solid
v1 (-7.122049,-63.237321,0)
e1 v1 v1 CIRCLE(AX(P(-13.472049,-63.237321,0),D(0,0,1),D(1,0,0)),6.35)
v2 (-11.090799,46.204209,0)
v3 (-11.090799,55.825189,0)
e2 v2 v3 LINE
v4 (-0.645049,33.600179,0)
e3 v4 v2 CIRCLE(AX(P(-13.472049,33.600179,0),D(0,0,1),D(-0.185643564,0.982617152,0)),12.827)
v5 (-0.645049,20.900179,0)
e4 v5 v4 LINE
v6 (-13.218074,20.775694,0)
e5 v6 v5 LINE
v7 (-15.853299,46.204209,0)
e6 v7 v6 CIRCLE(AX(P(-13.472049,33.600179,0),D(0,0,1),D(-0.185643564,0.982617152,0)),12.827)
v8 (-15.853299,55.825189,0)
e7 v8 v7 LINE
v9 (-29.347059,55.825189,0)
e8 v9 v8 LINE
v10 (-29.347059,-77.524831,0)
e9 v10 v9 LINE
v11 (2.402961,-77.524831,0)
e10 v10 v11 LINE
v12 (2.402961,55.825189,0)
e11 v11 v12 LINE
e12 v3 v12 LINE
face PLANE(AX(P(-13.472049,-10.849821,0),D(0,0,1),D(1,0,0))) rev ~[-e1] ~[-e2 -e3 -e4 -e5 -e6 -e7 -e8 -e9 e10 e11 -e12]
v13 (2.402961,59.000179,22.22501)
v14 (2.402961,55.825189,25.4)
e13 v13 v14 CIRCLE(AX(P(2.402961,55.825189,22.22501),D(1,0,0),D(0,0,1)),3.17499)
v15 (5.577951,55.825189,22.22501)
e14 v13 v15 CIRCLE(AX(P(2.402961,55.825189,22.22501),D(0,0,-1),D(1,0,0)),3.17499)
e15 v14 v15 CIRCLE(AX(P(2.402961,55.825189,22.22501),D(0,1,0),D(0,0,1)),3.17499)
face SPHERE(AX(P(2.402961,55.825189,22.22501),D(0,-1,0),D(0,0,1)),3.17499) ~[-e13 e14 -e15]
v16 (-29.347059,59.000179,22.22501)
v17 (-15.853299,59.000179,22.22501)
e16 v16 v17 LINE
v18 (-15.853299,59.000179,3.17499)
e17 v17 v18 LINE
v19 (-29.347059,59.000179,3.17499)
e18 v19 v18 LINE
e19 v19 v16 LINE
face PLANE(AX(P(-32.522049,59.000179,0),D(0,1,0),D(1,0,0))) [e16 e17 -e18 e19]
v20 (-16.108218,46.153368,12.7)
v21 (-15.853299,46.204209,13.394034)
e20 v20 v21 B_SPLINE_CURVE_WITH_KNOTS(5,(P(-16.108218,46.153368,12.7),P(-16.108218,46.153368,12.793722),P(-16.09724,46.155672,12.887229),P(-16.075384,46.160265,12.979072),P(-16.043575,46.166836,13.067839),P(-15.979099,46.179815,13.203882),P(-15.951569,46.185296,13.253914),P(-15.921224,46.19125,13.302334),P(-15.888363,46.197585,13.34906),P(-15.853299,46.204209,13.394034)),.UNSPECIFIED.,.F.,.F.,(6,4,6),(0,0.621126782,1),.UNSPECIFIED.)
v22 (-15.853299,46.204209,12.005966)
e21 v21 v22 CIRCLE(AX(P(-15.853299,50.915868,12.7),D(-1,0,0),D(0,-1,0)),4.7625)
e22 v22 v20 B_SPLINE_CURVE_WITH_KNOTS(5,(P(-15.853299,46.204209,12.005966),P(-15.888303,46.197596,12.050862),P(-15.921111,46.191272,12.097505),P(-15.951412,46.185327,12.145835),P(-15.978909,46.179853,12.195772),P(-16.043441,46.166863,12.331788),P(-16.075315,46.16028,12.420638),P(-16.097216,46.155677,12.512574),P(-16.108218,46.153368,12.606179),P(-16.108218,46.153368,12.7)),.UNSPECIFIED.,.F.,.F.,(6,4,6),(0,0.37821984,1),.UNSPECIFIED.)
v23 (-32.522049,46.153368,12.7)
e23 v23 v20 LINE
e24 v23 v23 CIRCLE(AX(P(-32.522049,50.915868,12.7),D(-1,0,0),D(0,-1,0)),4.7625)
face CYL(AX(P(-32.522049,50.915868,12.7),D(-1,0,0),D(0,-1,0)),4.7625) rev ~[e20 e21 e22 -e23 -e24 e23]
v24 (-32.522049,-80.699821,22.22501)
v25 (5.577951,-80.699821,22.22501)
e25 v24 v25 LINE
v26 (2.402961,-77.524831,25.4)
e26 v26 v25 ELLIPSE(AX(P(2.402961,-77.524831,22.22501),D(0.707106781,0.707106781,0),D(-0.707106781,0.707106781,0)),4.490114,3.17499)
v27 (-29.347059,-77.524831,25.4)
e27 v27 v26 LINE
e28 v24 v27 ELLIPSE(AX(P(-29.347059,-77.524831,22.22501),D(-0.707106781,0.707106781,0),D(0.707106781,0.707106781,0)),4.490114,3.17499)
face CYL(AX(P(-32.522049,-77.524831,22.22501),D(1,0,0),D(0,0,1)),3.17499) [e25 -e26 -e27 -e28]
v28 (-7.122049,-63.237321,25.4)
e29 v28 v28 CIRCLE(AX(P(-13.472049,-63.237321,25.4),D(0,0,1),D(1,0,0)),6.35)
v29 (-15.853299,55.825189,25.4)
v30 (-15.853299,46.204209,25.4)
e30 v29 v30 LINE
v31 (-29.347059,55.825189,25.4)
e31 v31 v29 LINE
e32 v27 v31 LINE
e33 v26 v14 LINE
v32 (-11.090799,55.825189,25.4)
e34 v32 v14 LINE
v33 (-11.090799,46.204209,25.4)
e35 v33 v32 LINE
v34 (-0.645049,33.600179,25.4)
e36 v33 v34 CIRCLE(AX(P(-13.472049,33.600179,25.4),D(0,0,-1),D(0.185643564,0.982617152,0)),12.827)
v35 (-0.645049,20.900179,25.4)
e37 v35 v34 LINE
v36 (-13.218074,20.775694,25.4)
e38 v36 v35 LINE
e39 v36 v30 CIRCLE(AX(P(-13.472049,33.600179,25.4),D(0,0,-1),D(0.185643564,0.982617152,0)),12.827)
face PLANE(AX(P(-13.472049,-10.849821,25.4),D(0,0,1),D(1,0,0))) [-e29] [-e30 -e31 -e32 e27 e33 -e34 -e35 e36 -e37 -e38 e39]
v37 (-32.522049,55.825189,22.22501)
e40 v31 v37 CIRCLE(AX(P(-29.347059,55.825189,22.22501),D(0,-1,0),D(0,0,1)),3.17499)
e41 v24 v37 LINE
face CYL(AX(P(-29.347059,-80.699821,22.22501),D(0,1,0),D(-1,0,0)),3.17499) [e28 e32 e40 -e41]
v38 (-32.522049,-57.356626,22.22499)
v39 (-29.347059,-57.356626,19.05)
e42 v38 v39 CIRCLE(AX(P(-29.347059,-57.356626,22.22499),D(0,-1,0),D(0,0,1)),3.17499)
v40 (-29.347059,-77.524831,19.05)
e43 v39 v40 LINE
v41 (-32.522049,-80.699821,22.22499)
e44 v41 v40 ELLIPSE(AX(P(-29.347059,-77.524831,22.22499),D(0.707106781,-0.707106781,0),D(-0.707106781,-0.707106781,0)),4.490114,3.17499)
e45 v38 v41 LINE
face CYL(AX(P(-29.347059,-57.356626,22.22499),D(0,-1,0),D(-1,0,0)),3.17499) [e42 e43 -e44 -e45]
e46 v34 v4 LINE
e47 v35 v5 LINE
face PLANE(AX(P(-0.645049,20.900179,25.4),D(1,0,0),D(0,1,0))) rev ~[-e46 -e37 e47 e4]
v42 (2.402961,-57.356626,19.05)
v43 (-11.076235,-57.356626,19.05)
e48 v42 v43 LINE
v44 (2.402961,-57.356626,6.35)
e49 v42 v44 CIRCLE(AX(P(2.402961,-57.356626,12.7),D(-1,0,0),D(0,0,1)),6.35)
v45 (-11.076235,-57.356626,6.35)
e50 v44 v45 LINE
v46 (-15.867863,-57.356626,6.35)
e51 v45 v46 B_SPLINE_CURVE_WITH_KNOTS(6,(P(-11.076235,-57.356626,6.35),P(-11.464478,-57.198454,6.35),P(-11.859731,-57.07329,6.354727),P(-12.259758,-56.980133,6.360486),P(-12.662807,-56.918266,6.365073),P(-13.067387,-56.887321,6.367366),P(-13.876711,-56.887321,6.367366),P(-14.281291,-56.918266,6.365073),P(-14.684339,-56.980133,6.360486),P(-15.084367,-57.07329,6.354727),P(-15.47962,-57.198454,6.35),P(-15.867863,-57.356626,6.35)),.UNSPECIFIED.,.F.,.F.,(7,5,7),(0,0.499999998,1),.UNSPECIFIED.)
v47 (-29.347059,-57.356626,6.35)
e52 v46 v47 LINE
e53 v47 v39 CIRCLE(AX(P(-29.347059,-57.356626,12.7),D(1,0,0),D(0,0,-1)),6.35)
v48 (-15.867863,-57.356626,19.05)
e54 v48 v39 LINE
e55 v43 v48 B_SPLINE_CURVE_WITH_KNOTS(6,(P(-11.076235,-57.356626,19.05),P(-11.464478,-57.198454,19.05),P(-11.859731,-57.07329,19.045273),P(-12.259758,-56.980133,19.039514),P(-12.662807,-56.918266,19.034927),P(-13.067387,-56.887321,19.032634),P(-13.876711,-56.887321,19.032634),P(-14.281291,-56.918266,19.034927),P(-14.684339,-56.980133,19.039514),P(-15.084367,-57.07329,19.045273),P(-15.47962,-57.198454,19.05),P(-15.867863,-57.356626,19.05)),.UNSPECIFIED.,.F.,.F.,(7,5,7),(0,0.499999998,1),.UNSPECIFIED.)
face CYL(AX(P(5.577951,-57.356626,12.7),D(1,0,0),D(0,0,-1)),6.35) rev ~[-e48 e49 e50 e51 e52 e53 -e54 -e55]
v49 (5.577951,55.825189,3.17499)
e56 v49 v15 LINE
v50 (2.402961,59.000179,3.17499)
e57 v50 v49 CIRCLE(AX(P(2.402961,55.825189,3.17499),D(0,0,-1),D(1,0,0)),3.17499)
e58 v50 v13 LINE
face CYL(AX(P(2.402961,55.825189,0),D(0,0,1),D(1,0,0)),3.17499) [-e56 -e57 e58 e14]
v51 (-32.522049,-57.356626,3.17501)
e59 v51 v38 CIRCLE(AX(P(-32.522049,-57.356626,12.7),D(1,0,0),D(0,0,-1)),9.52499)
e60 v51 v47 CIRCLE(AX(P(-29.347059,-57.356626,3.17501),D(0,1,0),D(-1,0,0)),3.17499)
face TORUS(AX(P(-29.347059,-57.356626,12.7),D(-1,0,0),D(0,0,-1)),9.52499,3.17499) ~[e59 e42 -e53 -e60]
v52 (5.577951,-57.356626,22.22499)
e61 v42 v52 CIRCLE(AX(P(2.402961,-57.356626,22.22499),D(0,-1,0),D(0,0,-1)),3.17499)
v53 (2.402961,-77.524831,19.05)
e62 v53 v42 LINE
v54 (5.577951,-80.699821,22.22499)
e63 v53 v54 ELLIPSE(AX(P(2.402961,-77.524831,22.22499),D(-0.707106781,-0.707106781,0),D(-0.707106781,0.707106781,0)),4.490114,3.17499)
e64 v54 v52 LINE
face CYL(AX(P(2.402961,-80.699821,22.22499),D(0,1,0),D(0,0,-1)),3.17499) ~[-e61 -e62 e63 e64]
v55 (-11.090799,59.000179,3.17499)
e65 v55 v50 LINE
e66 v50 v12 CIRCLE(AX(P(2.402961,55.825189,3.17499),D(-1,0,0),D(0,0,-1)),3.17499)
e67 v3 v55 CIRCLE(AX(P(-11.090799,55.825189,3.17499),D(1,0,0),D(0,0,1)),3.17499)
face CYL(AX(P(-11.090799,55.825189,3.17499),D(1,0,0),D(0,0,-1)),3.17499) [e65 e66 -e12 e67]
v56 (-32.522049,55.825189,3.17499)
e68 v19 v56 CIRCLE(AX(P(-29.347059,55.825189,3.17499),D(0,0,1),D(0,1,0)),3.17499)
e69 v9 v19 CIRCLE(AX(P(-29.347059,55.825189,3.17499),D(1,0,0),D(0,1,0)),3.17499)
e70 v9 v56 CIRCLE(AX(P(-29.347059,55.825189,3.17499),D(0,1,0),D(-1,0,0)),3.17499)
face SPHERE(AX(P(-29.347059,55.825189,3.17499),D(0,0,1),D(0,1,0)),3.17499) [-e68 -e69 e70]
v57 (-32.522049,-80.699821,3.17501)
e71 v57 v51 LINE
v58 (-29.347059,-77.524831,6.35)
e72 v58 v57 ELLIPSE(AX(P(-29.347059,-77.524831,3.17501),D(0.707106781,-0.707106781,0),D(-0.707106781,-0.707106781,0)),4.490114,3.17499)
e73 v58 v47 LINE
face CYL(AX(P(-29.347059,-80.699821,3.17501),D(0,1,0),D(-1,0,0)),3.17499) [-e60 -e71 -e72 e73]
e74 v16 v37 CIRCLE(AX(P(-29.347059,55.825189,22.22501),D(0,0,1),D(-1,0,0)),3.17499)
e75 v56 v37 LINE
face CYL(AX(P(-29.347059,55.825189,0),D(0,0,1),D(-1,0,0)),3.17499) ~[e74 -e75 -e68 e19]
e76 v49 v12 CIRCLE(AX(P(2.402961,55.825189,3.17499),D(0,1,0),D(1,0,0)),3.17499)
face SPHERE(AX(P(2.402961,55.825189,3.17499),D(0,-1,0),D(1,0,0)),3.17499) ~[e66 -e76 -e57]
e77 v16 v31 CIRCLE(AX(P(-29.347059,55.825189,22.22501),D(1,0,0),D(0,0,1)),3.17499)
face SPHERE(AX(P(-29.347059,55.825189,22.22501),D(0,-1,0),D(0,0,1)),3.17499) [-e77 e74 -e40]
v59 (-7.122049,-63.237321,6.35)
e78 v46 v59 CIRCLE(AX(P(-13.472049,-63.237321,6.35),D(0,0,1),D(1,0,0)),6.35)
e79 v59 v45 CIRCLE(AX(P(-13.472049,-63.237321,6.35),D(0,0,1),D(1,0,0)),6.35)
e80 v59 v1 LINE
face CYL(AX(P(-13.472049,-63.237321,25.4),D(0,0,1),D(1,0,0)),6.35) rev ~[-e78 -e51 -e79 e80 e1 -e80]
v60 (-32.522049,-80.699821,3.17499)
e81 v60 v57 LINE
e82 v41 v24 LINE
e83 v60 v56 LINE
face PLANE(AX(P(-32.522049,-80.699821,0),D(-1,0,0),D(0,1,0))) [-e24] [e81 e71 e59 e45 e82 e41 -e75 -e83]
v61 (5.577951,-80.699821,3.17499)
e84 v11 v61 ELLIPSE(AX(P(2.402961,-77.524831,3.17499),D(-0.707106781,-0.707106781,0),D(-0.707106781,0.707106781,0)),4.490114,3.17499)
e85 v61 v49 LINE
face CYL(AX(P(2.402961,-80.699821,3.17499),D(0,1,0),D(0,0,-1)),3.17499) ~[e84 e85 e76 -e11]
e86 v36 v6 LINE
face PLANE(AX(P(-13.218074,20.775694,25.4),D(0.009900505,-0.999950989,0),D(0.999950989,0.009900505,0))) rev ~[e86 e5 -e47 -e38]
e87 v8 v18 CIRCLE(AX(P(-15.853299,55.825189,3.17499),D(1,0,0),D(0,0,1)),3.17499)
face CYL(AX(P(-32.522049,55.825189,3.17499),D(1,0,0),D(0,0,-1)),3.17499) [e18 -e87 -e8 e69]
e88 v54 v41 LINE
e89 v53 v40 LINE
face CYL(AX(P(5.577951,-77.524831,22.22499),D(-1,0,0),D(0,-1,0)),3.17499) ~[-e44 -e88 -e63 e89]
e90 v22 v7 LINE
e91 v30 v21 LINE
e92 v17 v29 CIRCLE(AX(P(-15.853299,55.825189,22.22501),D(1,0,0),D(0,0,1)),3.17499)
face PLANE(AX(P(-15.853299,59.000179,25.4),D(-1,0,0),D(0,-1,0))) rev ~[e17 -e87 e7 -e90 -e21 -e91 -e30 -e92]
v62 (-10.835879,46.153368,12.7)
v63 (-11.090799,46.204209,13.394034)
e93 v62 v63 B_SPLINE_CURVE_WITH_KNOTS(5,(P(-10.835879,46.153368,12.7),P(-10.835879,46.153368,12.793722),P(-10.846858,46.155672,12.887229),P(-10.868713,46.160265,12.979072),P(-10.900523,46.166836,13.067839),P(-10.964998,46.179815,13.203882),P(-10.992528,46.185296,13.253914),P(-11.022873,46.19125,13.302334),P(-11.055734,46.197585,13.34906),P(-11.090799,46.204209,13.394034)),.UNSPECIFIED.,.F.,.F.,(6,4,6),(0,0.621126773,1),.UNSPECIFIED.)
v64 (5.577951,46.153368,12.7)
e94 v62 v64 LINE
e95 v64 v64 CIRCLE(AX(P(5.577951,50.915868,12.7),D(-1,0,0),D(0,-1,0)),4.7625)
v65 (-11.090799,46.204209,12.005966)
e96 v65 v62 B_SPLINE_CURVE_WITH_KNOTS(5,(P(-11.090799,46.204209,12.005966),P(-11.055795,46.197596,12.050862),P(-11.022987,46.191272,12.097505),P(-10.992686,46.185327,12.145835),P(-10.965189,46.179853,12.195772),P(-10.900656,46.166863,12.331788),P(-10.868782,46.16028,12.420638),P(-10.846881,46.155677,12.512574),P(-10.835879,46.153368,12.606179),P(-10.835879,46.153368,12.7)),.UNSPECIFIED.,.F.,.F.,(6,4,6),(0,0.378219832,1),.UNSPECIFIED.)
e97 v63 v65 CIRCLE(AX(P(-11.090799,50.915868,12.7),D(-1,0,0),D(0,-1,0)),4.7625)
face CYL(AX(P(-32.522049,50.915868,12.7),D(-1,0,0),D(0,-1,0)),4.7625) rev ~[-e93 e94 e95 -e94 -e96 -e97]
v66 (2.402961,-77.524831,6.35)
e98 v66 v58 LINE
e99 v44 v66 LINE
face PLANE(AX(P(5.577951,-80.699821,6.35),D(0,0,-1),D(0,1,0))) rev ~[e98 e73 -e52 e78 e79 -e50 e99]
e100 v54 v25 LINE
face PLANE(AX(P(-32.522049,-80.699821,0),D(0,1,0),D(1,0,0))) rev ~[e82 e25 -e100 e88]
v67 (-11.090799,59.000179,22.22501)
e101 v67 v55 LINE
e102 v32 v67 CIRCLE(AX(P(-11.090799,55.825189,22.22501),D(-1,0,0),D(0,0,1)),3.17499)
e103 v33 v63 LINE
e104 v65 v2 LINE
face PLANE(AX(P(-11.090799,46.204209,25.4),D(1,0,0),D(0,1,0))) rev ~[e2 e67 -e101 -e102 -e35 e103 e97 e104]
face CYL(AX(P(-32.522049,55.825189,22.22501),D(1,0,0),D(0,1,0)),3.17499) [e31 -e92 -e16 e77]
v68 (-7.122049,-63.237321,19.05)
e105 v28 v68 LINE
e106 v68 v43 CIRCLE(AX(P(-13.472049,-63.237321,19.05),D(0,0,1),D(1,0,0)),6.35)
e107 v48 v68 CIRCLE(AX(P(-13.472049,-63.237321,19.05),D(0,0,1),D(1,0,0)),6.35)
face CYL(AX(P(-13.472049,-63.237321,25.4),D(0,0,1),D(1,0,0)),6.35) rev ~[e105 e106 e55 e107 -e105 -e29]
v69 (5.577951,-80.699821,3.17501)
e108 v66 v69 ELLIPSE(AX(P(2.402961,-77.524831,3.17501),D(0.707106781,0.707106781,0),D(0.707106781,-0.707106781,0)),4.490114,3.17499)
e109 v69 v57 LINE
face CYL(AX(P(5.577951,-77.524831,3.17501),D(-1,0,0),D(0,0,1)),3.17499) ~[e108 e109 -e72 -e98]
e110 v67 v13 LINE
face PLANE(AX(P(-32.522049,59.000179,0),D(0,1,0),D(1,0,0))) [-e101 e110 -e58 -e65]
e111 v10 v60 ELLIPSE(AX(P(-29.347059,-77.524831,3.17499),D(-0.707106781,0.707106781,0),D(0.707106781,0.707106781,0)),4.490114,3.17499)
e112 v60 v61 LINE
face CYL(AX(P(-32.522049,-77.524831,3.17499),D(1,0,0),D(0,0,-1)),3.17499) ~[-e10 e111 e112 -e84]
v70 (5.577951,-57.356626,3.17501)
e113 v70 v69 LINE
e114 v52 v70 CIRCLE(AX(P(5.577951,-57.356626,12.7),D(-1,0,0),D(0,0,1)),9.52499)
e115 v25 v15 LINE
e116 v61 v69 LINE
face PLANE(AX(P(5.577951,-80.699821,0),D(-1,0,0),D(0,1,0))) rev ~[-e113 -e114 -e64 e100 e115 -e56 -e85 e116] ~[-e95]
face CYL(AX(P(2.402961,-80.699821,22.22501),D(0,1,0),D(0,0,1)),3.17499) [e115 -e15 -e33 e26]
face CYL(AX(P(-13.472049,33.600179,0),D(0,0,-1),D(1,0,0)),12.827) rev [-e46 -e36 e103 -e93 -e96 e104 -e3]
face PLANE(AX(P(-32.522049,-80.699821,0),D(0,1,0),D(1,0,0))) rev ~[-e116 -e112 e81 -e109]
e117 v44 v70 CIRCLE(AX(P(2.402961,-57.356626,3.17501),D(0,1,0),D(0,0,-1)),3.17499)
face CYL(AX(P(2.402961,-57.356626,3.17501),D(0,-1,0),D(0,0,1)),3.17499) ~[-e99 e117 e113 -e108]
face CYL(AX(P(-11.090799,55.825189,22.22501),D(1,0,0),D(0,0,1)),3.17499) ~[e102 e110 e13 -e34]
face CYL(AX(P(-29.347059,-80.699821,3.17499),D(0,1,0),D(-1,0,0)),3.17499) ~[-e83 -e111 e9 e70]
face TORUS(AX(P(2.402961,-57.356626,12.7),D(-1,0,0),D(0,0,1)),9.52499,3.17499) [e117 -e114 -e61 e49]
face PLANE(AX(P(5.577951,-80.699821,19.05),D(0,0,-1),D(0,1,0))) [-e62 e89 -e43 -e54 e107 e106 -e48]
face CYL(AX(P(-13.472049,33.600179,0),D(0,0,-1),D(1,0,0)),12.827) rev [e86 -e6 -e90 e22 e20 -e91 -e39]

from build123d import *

# Parameters (mm, degrees)
F0_W      = 38.1
F0_H      = 139.7
F0_R      = 12.827
F1_DEPTH  = 25.4
F3_DEPTH  = 25.4
F4_R      = 4.7625
F5_DEPTH  = 127
F6_R      = 6.35
F7_DEPTH  = 50.8
F8_W      = 23.3431950331
F8_H      = 12.7
F9_DEPTH  = 76.2
F10_R     = 3.17499
F12_DEPTH = 25.4


# Not quite as in the source:
# - a fillet or chamfer is up to 0.001 mm smaller than in the source, because OpenCascade refuses the exact size


with BuildPart() as f1:
    # F0 (on Top) → F1 (new body)
    with BuildSketch(Plane.XY):
        with Locations((-13.4720488012, -10.8498208284)):
            Rectangle(F0_W, F0_H)
        with Locations((-13.4720488012, 33.6001791716)):
            Circle(F0_R, mode=Mode.SUBTRACT)
    extrude(amount=F1_DEPTH)

    # F2 (on face) → F3 (cut)
    with BuildSketch(Plane.XY.offset(25.4)):
        with BuildLine():
            Line((-11.0907988012, 46.2042093777), (-11.0907988012, 59.0001791716))
            Line((-11.0907988012, 59.0001791716), (-15.8532988012, 59.0001791716))
            Line((-15.8532988012, 59.0001791716), (-15.8532988012, 46.2042093777))
            ThreePointArc((-15.8532988012, 46.2042093777), (-13.4720488012, 46.4271791716), (-11.0907988012, 46.2042093777))
        make_face()
    extrude(amount=-F3_DEPTH, mode=Mode.SUBTRACT)

    # F4 (on face) → F5 (cut)
    with BuildSketch(Plane(origin=(-32.5220488012, 0, 0), x_dir=(0, -1, 0), z_dir=(-1, 0, 0))):
        with Locations((-50.9158676147, 12.7)):
            Circle(F4_R)
    extrude(amount=-F5_DEPTH, mode=Mode.SUBTRACT)

    # F6 (on face) → F7 (cut)
    with BuildSketch(Plane.XY.offset(25.4)):
        with Locations((-13.4720488012, -63.2373208284)):
            Circle(F6_R)
    extrude(amount=-F7_DEPTH, mode=Mode.SUBTRACT)

    # F8 (on face) → F9 (cut)
    with BuildSketch(Plane.YZ.offset(5.5779511988)):
        with Locations((-69.0282233119, 12.7)):
            Rectangle(F8_W, F8_H)
        with BuildLine():
            Line((-57.3566257954, 19.05), (-57.3566257954, 6.35))
            ThreePointArc((-57.3566257954, 6.35), (-51.0066257954, 12.7), (-57.3566257954, 19.05))
        make_face()
    extrude(amount=-F9_DEPTH, mode=Mode.SUBTRACT)

    # F10 (radius 3.175 in the source; OpenCascade refuses exactly that, so slightly less here)
    f10_edges = [f1.edges().sort_by_distance(p)[0] for p in [
        (5.577951, -69.028223, 19.05),
        (-13.472049, -80.699821, 6.35),
        (5.577951, -10.849821, 25.4),
        (-32.522049, -10.849821, 25.4),
        (-13.472049, -80.699821, 25.4),
        (5.577951, -10.849821, 0),
        (-13.472049, -80.699821, 0),
        (-24.187674, 59.000179, 25.4),
        (-2.756424, 59.000179, 25.4),
        (-32.522049, 59.000179, 12.7),
        (5.577951, 59.000179, 12.7),
        (-2.756424, 59.000179, 0),
        (-24.187674, 59.000179, 0),
        (-32.522049, -10.849821, 0),
        (-13.472049, -80.699821, 19.05),
        (-32.522049, -51.006626, 12.7),
        (-32.522049, -69.028223, 6.35),
        (-32.522049, -69.028223, 19.05),
    ]]
    fillet(f10_edges, radius=F10_R)

    # F11 (on face) → F12 (cut)
    with BuildSketch(Plane.XY.offset(25.4)):
        with BuildLine():
            Line((-0.6450488012, 20.9001791716), (-0.6450488012, 33.6001791716))
            ThreePointArc((-0.6450488012, 33.6001791716), (-4.3126364935, 24.6203631836), (-13.2180736983, 20.7756937765))
            Line((-13.2180736983, 20.7756937765), (-0.6450488012, 20.9001791716))
        make_face()
    extrude(amount=-F12_DEPTH, mode=Mode.SUBTRACT)


solid = f1.part
